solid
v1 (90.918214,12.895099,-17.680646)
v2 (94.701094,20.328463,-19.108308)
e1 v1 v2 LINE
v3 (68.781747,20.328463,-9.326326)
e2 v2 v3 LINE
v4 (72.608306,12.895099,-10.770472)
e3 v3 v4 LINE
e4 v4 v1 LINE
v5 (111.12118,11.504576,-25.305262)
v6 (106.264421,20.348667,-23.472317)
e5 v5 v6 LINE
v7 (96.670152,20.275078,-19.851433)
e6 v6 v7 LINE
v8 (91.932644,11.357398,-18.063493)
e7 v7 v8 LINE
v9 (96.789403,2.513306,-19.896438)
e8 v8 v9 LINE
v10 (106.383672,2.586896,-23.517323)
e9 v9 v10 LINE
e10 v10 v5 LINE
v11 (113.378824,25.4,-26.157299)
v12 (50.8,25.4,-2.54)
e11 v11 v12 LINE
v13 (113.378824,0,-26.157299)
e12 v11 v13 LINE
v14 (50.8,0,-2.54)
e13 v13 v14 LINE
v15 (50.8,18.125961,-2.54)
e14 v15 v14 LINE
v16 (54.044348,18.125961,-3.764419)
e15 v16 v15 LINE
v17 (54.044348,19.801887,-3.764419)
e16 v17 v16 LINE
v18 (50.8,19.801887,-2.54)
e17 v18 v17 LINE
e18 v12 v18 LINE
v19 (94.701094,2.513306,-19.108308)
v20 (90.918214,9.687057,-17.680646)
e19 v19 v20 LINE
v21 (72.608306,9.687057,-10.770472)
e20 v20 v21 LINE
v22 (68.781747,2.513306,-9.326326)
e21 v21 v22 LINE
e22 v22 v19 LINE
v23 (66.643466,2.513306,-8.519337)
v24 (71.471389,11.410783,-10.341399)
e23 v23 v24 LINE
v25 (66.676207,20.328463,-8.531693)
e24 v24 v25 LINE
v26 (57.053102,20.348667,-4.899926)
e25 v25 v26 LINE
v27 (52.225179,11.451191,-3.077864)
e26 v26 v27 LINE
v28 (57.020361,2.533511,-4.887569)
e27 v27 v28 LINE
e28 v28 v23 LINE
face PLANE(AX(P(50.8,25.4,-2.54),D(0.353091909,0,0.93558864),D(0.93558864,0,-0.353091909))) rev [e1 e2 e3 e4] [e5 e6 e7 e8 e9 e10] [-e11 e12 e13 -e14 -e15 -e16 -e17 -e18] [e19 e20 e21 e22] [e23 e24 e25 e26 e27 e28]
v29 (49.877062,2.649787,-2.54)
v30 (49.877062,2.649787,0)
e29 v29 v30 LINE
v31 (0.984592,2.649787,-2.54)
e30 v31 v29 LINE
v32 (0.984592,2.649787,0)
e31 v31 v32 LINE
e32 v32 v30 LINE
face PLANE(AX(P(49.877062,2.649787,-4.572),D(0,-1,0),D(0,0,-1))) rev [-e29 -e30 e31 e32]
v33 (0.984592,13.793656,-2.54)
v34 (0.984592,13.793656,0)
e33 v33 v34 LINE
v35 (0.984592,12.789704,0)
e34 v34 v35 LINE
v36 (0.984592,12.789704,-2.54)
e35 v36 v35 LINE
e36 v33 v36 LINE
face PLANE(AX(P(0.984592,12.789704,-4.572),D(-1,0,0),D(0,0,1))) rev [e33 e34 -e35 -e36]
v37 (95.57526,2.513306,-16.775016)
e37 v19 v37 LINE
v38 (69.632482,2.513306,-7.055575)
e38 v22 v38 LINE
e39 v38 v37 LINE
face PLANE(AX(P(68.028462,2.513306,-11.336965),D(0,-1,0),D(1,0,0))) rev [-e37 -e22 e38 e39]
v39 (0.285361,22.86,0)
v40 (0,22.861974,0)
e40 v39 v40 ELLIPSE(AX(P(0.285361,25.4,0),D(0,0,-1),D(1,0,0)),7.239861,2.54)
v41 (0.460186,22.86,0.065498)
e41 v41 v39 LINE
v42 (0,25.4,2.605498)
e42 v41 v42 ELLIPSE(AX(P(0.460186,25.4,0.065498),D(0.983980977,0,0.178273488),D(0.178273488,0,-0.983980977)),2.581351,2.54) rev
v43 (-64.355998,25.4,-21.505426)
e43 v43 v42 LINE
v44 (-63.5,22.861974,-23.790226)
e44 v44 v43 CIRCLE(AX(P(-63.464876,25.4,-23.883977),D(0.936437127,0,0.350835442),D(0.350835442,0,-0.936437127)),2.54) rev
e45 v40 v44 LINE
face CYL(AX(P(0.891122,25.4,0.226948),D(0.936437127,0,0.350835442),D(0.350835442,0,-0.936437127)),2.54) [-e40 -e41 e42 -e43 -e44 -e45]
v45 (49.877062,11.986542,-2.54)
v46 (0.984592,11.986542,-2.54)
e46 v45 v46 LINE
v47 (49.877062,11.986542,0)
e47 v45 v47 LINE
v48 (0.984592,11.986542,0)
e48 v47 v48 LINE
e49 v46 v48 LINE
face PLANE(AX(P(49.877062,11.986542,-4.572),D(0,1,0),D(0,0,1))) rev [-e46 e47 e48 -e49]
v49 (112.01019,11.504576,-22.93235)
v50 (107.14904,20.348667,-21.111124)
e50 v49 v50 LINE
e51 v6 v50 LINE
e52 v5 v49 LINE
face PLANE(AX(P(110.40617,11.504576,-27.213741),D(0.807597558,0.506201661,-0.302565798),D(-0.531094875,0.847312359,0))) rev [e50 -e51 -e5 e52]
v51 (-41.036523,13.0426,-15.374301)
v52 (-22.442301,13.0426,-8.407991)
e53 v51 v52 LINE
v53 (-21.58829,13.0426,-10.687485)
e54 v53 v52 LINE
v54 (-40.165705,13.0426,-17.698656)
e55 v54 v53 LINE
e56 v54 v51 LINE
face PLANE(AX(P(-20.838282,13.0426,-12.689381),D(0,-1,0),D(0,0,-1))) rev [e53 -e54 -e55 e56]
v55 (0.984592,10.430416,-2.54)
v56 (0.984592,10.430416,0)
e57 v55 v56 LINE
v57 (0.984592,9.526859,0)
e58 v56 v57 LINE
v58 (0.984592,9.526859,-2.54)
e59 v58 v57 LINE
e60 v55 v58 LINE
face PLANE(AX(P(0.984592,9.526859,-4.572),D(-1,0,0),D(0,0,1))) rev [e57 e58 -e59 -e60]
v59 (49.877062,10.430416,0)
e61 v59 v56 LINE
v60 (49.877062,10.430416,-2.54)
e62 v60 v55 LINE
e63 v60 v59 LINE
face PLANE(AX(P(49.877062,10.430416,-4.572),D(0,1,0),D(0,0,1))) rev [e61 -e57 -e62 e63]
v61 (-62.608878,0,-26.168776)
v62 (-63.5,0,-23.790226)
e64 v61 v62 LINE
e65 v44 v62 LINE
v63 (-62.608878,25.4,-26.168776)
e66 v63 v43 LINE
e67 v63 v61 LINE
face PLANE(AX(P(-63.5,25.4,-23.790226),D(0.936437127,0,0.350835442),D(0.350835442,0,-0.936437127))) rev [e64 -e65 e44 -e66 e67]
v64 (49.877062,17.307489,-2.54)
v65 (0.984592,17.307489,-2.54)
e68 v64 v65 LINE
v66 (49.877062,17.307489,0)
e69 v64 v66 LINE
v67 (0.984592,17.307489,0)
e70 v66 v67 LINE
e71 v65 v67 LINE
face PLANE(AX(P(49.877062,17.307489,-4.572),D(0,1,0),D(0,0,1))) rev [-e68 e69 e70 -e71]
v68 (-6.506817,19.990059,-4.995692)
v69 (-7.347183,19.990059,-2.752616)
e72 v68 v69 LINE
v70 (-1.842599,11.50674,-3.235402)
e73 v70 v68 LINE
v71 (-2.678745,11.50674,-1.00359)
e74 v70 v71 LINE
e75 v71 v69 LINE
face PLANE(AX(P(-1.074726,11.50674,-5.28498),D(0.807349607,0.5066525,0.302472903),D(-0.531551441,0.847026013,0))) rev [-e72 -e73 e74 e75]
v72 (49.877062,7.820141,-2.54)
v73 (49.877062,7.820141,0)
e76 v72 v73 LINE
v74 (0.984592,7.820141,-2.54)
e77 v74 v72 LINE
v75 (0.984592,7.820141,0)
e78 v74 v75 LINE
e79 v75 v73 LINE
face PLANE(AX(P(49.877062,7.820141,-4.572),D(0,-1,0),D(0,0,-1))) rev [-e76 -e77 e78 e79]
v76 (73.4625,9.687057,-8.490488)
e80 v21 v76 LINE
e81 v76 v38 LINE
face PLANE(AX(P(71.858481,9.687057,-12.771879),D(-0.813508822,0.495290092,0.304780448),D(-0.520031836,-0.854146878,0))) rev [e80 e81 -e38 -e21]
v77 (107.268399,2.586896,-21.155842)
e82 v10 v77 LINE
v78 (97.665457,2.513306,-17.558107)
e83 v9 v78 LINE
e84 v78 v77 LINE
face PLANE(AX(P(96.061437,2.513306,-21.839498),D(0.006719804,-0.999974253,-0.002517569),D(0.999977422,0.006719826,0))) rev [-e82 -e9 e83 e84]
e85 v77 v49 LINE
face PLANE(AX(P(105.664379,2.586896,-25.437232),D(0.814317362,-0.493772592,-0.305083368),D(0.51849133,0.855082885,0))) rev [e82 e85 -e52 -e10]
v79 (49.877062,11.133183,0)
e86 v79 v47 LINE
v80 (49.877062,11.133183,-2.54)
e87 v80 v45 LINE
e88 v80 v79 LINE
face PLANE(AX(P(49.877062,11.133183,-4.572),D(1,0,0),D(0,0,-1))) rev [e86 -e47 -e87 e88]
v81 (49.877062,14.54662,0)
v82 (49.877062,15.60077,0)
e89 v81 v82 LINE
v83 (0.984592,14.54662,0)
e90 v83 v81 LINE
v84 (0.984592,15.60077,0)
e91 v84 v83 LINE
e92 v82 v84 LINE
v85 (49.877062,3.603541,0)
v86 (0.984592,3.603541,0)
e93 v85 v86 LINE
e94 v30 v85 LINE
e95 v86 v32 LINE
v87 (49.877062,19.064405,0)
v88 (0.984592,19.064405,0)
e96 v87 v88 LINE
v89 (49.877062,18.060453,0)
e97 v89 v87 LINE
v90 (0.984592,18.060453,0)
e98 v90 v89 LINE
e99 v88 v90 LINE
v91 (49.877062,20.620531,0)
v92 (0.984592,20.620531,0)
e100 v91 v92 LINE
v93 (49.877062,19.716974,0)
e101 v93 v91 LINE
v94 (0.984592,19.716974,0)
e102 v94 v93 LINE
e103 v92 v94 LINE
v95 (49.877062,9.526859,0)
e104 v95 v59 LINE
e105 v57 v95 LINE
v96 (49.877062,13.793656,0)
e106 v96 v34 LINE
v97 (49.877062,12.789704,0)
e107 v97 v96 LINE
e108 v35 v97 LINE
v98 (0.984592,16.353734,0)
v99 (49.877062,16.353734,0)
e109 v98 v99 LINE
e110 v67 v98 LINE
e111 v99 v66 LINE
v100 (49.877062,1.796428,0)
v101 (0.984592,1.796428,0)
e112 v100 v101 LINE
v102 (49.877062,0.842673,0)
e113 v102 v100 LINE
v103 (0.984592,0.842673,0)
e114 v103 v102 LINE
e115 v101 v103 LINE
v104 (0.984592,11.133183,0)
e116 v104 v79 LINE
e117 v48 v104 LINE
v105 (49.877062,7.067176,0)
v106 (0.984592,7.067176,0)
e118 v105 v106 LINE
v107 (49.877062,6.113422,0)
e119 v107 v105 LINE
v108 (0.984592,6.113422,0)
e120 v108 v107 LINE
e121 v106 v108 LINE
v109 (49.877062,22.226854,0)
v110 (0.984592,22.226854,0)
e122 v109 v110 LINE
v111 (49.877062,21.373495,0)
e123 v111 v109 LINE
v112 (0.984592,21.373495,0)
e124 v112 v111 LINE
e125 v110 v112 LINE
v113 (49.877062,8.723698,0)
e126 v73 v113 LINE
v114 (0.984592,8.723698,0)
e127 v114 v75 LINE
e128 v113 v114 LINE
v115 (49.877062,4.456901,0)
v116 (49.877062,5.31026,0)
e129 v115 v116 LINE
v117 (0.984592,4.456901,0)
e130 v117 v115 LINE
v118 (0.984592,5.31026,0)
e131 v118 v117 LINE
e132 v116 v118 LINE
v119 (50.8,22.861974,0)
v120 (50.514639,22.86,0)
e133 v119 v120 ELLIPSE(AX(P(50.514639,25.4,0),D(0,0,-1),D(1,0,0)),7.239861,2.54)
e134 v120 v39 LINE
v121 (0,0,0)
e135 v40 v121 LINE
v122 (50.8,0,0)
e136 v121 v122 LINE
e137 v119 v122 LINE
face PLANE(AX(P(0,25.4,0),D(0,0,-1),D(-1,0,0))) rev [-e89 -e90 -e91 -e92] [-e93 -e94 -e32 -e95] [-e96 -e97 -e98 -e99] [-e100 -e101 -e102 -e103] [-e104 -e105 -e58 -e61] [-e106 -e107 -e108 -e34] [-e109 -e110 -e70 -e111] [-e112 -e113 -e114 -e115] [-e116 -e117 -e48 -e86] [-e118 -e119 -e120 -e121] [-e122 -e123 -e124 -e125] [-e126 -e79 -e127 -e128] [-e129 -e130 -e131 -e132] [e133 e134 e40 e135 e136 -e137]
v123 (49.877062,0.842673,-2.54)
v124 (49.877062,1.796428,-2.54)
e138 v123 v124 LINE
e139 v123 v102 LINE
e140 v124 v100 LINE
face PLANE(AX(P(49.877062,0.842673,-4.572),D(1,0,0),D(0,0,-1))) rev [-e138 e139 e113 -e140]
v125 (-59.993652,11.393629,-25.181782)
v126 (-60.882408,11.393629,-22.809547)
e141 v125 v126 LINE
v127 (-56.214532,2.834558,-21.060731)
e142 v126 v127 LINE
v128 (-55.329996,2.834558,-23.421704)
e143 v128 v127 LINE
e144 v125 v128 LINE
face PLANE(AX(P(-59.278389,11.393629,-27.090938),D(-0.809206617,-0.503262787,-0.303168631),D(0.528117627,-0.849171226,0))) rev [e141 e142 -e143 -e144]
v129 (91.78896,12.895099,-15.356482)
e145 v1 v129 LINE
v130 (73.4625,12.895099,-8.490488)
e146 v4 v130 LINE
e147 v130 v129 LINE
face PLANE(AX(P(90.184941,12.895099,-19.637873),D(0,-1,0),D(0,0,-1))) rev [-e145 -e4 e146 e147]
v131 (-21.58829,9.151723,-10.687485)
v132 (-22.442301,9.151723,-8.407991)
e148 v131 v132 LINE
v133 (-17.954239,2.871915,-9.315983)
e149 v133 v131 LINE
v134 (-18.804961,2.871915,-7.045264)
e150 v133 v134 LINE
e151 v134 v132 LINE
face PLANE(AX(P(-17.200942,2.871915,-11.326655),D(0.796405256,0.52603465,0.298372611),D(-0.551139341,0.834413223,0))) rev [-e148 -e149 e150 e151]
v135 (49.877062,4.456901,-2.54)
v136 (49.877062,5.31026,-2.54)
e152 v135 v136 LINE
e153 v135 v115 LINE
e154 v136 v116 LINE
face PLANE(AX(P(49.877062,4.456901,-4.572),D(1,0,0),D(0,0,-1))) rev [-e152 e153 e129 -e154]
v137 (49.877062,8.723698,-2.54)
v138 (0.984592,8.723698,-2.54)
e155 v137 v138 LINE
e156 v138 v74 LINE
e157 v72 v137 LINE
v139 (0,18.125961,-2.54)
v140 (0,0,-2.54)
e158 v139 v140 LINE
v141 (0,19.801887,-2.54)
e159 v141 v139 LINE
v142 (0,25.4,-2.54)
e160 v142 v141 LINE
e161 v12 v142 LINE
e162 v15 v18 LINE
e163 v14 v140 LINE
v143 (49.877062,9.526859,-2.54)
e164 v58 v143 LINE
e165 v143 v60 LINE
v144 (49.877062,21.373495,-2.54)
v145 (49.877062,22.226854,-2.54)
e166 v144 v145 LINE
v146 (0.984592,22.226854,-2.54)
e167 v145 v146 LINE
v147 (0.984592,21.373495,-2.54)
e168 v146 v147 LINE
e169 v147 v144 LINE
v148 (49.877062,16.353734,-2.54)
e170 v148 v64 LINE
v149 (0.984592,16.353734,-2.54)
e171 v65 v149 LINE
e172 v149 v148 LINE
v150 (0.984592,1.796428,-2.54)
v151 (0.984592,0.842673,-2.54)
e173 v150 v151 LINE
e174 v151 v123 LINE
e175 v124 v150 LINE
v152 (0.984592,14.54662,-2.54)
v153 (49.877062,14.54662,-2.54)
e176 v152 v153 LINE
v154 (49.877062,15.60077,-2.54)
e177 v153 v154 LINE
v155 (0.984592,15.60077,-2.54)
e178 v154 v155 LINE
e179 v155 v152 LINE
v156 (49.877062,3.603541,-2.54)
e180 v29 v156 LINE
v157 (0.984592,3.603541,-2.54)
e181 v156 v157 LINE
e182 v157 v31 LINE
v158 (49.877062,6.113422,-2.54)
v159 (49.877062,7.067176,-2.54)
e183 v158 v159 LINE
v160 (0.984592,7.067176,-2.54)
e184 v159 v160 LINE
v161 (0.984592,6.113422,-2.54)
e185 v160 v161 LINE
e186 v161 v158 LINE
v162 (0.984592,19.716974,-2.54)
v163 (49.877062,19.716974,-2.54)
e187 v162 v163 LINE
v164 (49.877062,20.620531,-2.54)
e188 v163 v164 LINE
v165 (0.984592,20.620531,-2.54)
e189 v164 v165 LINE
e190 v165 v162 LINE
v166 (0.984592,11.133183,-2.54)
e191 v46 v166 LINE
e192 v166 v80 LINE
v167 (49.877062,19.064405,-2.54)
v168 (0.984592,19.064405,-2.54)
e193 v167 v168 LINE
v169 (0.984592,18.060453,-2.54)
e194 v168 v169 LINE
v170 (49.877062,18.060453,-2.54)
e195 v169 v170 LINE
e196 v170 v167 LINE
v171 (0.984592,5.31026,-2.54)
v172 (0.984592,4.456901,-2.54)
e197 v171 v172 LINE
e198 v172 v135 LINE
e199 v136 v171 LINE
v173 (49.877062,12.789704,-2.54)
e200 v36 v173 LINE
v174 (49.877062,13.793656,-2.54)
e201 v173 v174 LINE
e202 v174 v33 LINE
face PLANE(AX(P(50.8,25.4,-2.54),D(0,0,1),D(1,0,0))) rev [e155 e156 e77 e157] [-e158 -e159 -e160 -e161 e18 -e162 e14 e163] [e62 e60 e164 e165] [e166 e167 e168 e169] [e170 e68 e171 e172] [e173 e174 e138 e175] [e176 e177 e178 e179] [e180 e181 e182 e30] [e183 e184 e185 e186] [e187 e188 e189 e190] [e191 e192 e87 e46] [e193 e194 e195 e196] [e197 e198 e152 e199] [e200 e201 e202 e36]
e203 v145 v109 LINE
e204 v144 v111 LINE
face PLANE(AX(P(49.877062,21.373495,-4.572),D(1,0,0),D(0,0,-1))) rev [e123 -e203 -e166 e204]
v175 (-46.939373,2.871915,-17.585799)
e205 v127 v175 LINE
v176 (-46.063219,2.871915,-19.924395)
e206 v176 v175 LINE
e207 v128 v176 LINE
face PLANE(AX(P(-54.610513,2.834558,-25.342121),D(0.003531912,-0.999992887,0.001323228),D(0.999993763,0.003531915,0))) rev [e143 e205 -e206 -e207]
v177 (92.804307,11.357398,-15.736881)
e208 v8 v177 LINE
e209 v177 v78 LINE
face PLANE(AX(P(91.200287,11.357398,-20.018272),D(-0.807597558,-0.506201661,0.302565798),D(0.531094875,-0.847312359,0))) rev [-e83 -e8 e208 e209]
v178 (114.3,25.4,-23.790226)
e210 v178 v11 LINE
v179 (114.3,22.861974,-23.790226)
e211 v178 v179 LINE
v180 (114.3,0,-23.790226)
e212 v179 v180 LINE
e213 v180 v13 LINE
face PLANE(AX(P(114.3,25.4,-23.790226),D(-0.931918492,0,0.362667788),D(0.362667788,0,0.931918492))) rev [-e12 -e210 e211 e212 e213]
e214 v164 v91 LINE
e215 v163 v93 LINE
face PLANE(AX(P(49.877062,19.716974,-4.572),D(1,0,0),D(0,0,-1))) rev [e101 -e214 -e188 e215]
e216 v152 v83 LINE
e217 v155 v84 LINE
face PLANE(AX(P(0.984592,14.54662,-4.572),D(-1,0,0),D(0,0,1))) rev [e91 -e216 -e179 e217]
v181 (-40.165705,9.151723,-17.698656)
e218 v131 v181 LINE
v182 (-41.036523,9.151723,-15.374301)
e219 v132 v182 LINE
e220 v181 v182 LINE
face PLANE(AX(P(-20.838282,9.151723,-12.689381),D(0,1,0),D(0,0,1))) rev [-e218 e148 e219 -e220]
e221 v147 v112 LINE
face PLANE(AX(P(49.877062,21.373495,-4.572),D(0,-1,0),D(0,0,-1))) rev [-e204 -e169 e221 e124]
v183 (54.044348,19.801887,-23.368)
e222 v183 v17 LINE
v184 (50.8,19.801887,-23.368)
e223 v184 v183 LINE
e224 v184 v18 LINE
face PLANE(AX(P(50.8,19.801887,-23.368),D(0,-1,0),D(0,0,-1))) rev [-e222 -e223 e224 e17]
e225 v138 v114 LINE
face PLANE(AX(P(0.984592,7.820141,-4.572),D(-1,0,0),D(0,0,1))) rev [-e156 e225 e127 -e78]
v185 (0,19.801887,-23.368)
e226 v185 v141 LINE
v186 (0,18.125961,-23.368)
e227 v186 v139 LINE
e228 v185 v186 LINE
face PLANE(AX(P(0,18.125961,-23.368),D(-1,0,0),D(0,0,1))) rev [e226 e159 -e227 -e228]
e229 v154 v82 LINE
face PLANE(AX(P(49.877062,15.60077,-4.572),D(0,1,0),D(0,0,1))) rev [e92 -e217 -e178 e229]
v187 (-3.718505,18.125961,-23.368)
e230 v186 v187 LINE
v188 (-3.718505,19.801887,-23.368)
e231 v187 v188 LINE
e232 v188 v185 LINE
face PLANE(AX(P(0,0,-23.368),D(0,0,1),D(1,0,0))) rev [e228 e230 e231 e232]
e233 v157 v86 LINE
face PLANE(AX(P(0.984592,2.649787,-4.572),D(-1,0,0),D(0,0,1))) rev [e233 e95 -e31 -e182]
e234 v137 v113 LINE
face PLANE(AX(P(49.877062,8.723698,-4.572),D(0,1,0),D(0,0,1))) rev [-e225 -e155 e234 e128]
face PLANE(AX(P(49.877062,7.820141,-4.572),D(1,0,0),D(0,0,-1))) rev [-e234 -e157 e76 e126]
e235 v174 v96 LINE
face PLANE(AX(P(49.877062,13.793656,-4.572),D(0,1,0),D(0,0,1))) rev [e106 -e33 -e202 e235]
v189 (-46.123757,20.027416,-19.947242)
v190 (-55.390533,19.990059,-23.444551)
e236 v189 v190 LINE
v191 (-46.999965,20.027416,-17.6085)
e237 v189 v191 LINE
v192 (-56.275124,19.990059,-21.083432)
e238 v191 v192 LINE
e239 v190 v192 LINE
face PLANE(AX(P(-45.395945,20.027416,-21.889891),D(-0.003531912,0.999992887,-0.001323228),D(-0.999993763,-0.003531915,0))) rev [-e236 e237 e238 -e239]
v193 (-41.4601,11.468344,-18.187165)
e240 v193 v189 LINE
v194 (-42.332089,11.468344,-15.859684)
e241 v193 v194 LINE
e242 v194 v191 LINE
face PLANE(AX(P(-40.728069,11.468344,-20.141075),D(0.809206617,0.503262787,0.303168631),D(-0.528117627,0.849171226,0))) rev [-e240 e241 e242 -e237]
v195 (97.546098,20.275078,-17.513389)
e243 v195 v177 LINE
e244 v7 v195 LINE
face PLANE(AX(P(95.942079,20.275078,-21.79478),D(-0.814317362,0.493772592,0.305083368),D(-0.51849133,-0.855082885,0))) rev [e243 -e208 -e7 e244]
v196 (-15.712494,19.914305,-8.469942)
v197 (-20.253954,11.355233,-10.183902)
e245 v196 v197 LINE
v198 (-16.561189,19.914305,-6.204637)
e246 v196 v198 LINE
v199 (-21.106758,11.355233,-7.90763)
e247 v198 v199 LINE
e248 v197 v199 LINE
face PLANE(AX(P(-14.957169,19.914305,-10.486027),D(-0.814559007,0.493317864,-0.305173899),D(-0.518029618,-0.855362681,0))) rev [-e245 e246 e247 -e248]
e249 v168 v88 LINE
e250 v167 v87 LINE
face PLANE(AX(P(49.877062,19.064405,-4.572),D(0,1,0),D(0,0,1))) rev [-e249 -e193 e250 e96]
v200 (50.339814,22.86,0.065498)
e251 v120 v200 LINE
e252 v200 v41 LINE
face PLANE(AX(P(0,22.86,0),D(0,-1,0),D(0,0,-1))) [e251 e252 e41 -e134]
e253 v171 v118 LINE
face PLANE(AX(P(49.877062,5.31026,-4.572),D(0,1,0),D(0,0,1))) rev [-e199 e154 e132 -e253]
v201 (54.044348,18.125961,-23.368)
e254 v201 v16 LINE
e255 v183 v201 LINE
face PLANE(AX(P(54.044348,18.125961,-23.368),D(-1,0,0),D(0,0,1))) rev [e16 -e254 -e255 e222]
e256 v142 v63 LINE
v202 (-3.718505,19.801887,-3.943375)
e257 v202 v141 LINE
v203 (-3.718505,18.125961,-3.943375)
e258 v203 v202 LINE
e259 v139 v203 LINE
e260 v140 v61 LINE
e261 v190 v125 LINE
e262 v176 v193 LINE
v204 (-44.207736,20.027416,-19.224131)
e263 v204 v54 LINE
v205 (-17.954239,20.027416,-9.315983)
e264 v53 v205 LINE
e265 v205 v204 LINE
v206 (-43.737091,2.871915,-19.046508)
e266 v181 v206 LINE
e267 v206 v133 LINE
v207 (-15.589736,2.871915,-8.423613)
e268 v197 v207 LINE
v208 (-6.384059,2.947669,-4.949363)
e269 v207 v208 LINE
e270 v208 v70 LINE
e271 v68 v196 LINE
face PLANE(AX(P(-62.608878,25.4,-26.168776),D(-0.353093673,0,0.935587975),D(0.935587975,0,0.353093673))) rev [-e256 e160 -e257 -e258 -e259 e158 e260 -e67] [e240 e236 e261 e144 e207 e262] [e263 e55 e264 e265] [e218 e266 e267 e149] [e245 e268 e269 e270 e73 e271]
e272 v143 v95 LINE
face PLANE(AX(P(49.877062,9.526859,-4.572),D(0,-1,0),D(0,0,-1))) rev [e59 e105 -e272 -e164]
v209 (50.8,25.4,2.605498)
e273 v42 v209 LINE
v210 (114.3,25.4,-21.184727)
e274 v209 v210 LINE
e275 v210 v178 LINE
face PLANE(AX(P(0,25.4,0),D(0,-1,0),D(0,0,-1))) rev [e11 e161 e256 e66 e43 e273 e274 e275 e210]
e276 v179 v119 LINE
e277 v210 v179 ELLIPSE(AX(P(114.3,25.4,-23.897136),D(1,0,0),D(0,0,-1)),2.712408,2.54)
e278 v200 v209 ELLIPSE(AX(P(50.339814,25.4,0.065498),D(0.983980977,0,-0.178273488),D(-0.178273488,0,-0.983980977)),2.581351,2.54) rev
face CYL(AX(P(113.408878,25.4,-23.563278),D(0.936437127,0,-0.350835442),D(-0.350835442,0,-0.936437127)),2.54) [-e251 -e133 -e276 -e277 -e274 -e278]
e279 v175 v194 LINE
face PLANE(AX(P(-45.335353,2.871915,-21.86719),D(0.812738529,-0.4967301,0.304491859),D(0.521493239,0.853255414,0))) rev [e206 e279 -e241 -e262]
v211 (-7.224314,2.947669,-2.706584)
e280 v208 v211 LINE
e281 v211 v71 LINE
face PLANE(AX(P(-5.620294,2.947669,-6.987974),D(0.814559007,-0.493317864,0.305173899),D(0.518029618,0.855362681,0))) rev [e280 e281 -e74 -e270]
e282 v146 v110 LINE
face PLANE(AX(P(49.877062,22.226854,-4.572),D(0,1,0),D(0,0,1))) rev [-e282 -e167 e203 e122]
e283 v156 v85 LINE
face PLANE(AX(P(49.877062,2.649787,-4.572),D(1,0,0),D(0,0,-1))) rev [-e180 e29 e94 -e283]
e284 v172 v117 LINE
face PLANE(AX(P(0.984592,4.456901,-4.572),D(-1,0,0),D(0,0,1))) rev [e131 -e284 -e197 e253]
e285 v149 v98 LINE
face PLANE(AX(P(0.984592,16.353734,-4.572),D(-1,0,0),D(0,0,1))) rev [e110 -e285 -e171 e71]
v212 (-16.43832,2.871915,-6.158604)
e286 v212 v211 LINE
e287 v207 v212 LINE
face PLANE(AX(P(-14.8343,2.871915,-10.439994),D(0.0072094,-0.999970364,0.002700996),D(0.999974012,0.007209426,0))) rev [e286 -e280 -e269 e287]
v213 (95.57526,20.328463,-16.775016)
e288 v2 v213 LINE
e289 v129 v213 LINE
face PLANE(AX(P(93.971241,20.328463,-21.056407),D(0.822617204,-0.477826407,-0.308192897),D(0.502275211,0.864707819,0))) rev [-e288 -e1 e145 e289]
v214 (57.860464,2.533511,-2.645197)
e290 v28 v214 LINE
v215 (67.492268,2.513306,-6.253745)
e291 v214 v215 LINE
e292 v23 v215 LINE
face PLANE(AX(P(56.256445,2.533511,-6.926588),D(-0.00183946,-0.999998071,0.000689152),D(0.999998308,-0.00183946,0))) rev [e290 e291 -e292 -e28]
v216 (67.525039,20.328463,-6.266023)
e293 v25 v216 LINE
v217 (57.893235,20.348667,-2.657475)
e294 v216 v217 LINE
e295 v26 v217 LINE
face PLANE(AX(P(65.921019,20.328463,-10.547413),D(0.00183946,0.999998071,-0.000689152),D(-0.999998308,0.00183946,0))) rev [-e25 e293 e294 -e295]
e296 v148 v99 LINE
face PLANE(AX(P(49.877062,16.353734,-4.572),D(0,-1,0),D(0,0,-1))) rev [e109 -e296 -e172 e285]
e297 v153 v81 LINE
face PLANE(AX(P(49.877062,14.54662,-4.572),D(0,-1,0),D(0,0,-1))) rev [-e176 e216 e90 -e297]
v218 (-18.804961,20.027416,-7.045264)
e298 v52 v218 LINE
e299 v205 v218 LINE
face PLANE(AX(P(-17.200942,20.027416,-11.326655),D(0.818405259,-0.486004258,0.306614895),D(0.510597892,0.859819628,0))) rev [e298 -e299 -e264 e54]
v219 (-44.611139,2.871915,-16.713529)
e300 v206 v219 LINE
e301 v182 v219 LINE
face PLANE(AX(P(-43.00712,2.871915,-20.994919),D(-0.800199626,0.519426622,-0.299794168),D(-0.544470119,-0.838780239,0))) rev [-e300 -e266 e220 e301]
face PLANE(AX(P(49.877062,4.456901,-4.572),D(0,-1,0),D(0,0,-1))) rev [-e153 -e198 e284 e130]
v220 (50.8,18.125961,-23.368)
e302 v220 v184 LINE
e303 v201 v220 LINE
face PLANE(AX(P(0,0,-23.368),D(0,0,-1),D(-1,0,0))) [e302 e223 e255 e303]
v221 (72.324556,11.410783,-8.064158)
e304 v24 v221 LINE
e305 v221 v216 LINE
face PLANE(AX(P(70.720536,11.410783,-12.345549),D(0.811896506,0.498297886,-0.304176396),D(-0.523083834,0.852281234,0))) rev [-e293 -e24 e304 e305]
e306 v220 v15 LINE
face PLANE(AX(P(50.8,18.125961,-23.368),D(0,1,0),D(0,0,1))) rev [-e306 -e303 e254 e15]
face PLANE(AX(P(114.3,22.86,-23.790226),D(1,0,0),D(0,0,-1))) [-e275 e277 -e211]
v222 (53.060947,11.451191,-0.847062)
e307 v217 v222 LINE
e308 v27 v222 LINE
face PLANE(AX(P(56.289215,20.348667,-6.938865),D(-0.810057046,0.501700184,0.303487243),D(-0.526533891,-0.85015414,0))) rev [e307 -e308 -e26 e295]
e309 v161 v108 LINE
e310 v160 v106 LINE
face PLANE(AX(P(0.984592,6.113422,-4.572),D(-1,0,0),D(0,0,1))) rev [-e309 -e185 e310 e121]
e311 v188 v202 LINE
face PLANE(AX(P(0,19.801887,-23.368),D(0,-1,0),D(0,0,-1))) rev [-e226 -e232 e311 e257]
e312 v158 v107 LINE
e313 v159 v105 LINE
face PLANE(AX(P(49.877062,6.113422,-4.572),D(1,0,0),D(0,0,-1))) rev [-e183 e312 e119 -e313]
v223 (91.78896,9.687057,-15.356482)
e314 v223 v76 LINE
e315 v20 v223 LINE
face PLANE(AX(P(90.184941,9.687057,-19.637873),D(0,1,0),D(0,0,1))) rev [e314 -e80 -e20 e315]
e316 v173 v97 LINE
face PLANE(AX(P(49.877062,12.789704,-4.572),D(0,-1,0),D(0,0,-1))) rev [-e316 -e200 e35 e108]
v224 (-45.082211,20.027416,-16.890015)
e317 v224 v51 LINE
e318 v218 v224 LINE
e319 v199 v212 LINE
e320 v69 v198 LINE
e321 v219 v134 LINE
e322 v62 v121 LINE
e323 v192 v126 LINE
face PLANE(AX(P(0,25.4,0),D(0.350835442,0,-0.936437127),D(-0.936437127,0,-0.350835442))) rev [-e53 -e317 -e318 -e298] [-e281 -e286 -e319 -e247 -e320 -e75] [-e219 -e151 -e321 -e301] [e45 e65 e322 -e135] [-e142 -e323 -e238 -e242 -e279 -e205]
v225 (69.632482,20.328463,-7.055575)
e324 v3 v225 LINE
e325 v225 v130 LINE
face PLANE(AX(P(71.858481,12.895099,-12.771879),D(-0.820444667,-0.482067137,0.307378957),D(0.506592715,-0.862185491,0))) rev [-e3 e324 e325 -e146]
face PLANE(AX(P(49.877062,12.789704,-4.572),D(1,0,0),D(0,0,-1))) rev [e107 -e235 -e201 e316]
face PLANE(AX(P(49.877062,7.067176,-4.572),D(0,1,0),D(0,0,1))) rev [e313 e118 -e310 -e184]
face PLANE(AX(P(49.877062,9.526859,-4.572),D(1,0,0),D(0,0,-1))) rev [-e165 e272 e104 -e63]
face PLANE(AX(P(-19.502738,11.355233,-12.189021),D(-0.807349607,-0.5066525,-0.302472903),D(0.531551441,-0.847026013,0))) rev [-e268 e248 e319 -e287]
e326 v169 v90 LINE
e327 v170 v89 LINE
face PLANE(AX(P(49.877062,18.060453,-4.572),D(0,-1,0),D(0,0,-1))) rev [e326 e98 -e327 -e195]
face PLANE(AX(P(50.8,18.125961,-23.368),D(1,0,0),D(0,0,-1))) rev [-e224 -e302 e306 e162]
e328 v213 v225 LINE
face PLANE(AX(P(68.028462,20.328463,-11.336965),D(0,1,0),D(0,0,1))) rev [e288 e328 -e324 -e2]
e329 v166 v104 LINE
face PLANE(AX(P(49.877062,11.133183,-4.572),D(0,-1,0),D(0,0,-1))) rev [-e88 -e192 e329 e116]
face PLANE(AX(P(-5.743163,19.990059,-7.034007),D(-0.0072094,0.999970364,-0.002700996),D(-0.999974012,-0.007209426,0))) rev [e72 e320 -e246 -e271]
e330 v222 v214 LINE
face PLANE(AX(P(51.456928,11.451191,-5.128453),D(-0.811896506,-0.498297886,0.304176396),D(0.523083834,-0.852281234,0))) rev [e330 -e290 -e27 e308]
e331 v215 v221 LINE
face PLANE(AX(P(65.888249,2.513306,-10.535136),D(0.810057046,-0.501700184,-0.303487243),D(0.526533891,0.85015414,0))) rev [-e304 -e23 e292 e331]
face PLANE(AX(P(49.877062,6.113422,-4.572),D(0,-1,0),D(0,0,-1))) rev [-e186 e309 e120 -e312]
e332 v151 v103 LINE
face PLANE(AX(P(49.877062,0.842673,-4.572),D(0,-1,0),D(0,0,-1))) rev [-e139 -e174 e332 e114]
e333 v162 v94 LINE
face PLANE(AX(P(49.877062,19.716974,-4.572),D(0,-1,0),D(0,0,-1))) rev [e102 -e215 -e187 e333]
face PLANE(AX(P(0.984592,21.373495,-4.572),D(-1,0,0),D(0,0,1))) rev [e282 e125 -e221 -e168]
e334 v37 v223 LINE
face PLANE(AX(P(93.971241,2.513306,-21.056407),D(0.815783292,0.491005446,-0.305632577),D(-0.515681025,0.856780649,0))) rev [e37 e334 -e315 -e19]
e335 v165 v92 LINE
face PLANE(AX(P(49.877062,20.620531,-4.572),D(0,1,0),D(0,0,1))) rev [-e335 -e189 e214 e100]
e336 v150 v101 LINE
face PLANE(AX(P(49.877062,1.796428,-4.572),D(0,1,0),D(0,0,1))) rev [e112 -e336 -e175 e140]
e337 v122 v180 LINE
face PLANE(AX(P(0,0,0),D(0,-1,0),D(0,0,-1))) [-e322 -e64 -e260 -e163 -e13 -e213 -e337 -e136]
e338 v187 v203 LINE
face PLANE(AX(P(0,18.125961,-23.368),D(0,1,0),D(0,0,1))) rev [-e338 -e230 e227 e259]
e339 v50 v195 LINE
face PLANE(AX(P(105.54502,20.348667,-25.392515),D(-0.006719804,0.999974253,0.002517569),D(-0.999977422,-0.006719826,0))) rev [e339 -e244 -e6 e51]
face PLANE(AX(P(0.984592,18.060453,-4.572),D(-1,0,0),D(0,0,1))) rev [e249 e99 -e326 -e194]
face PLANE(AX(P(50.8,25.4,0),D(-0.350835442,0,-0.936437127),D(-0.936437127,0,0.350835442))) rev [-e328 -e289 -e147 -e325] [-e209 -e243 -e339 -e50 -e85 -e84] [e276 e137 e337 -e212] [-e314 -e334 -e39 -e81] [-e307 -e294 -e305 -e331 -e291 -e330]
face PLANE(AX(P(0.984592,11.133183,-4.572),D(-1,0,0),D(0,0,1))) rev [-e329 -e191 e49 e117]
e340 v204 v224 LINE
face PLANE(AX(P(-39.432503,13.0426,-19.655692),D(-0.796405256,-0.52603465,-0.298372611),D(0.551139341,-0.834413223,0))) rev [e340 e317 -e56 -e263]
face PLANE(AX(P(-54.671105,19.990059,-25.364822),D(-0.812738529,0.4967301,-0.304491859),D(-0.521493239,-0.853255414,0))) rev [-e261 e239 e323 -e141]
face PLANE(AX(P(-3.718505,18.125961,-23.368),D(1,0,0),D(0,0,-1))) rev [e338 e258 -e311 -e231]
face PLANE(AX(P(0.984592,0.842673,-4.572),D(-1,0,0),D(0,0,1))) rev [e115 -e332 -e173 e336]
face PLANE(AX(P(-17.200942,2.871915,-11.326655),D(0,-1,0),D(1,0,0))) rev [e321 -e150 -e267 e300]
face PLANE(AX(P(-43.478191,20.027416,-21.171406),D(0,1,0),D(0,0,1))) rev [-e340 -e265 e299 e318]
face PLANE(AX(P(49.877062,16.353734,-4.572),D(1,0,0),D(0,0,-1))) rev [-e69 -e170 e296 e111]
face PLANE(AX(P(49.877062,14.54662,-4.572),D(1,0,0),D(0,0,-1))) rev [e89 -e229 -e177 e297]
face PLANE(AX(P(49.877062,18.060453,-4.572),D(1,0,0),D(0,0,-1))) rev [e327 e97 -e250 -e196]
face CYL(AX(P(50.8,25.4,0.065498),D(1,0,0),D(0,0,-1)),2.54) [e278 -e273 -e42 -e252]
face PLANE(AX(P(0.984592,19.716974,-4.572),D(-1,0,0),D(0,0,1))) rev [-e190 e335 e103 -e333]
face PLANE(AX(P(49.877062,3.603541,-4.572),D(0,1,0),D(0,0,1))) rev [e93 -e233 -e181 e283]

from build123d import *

# Parameters (mm, degrees)
BOSS_EXTRUDE1_DEPTH = 25.4
BOSS_EXTRUDE2_DEPTH = 2.54
FILLET1_R           = 2.54
SKETCH4_W           = 48.892470686
SKETCH4_H           = 0.953754561
SKETCH4_H_2         = 0.953754562
SKETCH4_H_3         = 0.853359345
SKETCH4_H_4         = 0.903556953
SKETCH4_H_5         = 0.853359344
SKETCH4_H_6         = 1.00395217
SKETCH4_H_7         = 1.054149779
CUT_EXTRUDE1_DEPTH  = 4.572
CUT_EXTRUDE2_DEPTH  = 4.572
CUT_EXTRUDE3_DEPTH  = 4.572
SKETCH7_W           = 3.24434763
SKETCH7_H           = 1.675925382
SKETCH7_W_2         = 3.718505185
BOSS_EXTRUDE3_DEPTH = 20.828


with BuildPart() as part:
    # Sketch1 → Boss-Extrude1 (new body)
    with BuildSketch(Plane(origin=(0, 0, 0), x_dir=(1, 0, 0), z_dir=(0, 1, 0))):
        Polygon((0, 0), (50.8, 0), (114.3, 23.790225691), (113.37882382, 26.157298661), (50.8, 2.54), (0, 2.54), (-62.608877976, 26.168775993), (-63.5, 23.790225691), align=None)
    extrude(amount=BOSS_EXTRUDE1_DEPTH)

    # Sketch3 → Boss-Extrude2 (add)
    with BuildSketch(Plane(origin=(0, 25.4, 0), x_dir=(1, 0, 0), z_dir=(0, 1, 0))):
        Polygon((-63.5, 23.790225691), (0, 0), (50.8, 0), (114.3, 23.790225691), (114.3, 21.184727317), (50.8, -2.605498375), (0, -2.605498375), (-64.355998278, 21.505426407), align=None)
    extrude(amount=-BOSS_EXTRUDE2_DEPTH)

    # Fillet1
    # the kernel refuses this fillet: 2.54 mm, written as the material it takes off along each edge
    with BuildSketch(Plane(origin=(5.946375755, 22.86, 4.833303434), x_dir=(0, 1, 0), z_dir=(-0.9364371267563882, 0, -0.35083544238323483))) as fillet1_piece_1_section:
        with BuildLine():
            CenterArc((FILLET1_R, FILLET1_R), FILLET1_R, 180, 90)
            Line((0, FILLET1_R), (0, 0))
            Line((0, 0), (FILLET1_R, 0))
        make_face()
    fillet1_piece_1 = extrude(amount=81.424313079, mode=Mode.PRIVATE)
    fillet1_piece_1 = split(fillet1_piece_1, bisect_by=Plane(origin=(0.305909805, 23.474834282, 0), z_dir=(0, 0, 1)), keep=Keep.TOP, mode=Mode.PRIVATE)
    fillet1_piece_1 = split(fillet1_piece_1, bisect_by=Plane(origin=(0.984368862, 23.474834282, 0.36879303), z_dir=(-0.35083544238323505, 0, 0.9364371267563881)), keep=Keep.TOP, mode=Mode.PRIVATE)
    add(fillet1_piece_1, mode=Mode.SUBTRACT)
    with BuildSketch(Plane(origin=(5.946375755, 22.86, 4.833303434), x_dir=(0, 1, 0), z_dir=(-0.9364371267563882, 0, -0.35083544238323483))) as fillet1_piece_2_section:
        with BuildLine():
            CenterArc((FILLET1_R, FILLET1_R), FILLET1_R, 180, 90)
            Line((0, FILLET1_R), (0, 0))
            Line((0, 0), (FILLET1_R, 0))
        make_face()
    fillet1_piece_2 = extrude(amount=81.424313079, mode=Mode.PRIVATE)
    fillet1_piece_2 = split(fillet1_piece_2, bisect_by=Plane(origin=(3.480294326, 22.834935374, 0), z_dir=(0, 0, 1)), keep=Keep.TOP, mode=Mode.PRIVATE)
    fillet1_piece_2 = split(fillet1_piece_2, bisect_by=Plane(origin=(3.46295466, 22.834935374, 1.297393274), z_dir=(0.35083544238323505, 0, -0.9364371267563881)), keep=Keep.TOP, mode=Mode.PRIVATE)
    add(fillet1_piece_2, mode=Mode.SUBTRACT)
    with BuildSketch(Plane(origin=(5.946375755, 22.86, 4.833303434), x_dir=(0, 1, 0), z_dir=(-0.9364371267563882, 0, -0.35083544238323483))) as fillet1_piece_3_section:
        with BuildLine():
            CenterArc((FILLET1_R, FILLET1_R), FILLET1_R, 180, 90)
            Line((0, FILLET1_R), (0, 0))
            Line((0, 0), (FILLET1_R, 0))
        make_face()
    fillet1_piece_3 = extrude(amount=81.424313079, mode=Mode.PRIVATE)
    fillet1_piece_3 = split(fillet1_piece_3, bisect_by=Plane(origin=(-37.699790788, 23.430211039, 0), z_dir=(0, 0, -1)), keep=Keep.TOP, mode=Mode.PRIVATE)
    fillet1_piece_3 = split(fillet1_piece_3, bisect_by=Plane(origin=(-37.047344153, 23.430211039, -13.879758719), z_dir=(-0.35083544238323505, 0, 0.9364371267563881)), keep=Keep.TOP, mode=Mode.PRIVATE)
    add(fillet1_piece_3, mode=Mode.SUBTRACT)
    with BuildSketch(Plane(origin=(57.15, 22.86, 2.605498375), x_dir=(0, 1, 0), z_dir=(-1, 0, 0))) as fillet1_piece_4:
        with BuildLine():
            CenterArc((FILLET1_R, FILLET1_R), FILLET1_R, 180, 90)
            Line((0, FILLET1_R), (0, 0))
            Line((0, 0), (FILLET1_R, 0))
        make_face()
    extrude(amount=63.5, mode=Mode.SUBTRACT)
    with BuildSketch(Plane(origin=(120.246375755, 22.86, -23.412532376), x_dir=(0, 1, 0), z_dir=(-0.9364371267563881, 0, 0.3508354423832351))) as fillet1_piece_5_section:
        with BuildLine():
            CenterArc((FILLET1_R, FILLET1_R), FILLET1_R, 180, 90)
            Line((0, FILLET1_R), (0, 0))
            Line((0, 0), (FILLET1_R, 0))
        make_face()
    fillet1_piece_5 = extrude(amount=80.510211904, mode=Mode.PRIVATE)
    fillet1_piece_5 = split(fillet1_piece_5, bisect_by=Plane(origin=(88.071552379, 23.43012107, 0), z_dir=(0, 0, -1)), keep=Keep.TOP, mode=Mode.PRIVATE)
    fillet1_piece_5 = split(fillet1_piece_5, bisect_by=Plane(origin=(87.41915819, 23.43012107, -13.719339181), z_dir=(0.35083544238323505, 0, 0.9364371267563881)), keep=Keep.TOP, mode=Mode.PRIVATE)
    add(fillet1_piece_5, mode=Mode.SUBTRACT)
    with BuildSketch(Plane(origin=(120.246375755, 22.86, -23.412532376), x_dir=(0, 1, 0), z_dir=(-0.9364371267563881, 0, 0.3508354423832351))) as fillet1_piece_6_section:
        with BuildLine():
            CenterArc((FILLET1_R, FILLET1_R), FILLET1_R, 180, 90)
            Line((0, FILLET1_R), (0, 0))
            Line((0, 0), (FILLET1_R, 0))
        make_face()
    fillet1_piece_6 = extrude(amount=80.510211904, mode=Mode.PRIVATE)
    fillet1_piece_6 = split(fillet1_piece_6, bisect_by=Plane(origin=(50.494090195, 23.474834282, 0), z_dir=(0, 0, 1)), keep=Keep.TOP, mode=Mode.PRIVATE)
    fillet1_piece_6 = split(fillet1_piece_6, bisect_by=Plane(origin=(49.815631138, 23.474834282, 0.36879303), z_dir=(0.35083544238323505, 0, 0.9364371267563881)), keep=Keep.TOP, mode=Mode.PRIVATE)
    add(fillet1_piece_6, mode=Mode.SUBTRACT)
    with BuildSketch(Plane(origin=(120.246375755, 22.86, -23.412532376), x_dir=(0, 1, 0), z_dir=(-0.9364371267563881, 0, 0.3508354423832351))) as fillet1_piece_7_section:
        with BuildLine():
            CenterArc((FILLET1_R, FILLET1_R), FILLET1_R, 180, 90)
            Line((0, FILLET1_R), (0, 0))
            Line((0, 0), (FILLET1_R, 0))
        make_face()
    fillet1_piece_7 = extrude(amount=80.510211904, mode=Mode.PRIVATE)
    fillet1_piece_7 = split(fillet1_piece_7, bisect_by=Plane(origin=(47.319705674, 22.834935374, 0), z_dir=(0, 0, 1)), keep=Keep.TOP, mode=Mode.PRIVATE)
    fillet1_piece_7 = split(fillet1_piece_7, bisect_by=Plane(origin=(47.33704534, 22.834935374, 1.297393274), z_dir=(-0.35083544238323505, 0, -0.9364371267563881)), keep=Keep.TOP, mode=Mode.PRIVATE)
    add(fillet1_piece_7, mode=Mode.SUBTRACT)

    # Sketch4 → Cut-Extrude1 (cut)
    with BuildSketch(Plane.XY):
        with Locations((25.43082689, 1.319550291)):
            Rectangle(SKETCH4_W, SKETCH4_H)
        with Locations((25.43082689, 3.126664197)):
            Rectangle(SKETCH4_W, SKETCH4_H_2)
        with Locations((25.43082689, 4.883580495)):
            Rectangle(SKETCH4_W, SKETCH4_H_3)
        with Locations((25.43082689, 6.590299184)):
            Rectangle(SKETCH4_W, SKETCH4_H_2)
        with Locations((25.43082689, 8.271919069)):
            Rectangle(SKETCH4_W, SKETCH4_H_4)
        with Locations((25.43082689, 9.978637758)):
            Rectangle(SKETCH4_W, SKETCH4_H_4)
        with Locations((25.43082689, 11.559862426)):
            Rectangle(SKETCH4_W, SKETCH4_H_5)
        with Locations((25.43082689, 13.29167992)):
            Rectangle(SKETCH4_W, SKETCH4_H_6)
        with Locations((25.43082689, 15.073695022)):
            Rectangle(SKETCH4_W, SKETCH4_H_7)
        with Locations((25.43082689, 16.83061132)):
            Rectangle(SKETCH4_W, SKETCH4_H)
        with Locations((25.43082689, 18.562428813)):
            Rectangle(SKETCH4_W, SKETCH4_H_6)
        with Locations((25.43082689, 20.168752286)):
            Rectangle(SKETCH4_W, SKETCH4_H_4)
        with Locations((25.43082689, 21.800174562)):
            Rectangle(SKETCH4_W, SKETCH4_H_3)
    extrude(amount=-CUT_EXTRUDE1_DEPTH, mode=Mode.SUBTRACT)

    # Sketch5 → Cut-Extrude2 (cut)
    with BuildSketch(Plane(origin=(6.252743788, 0, 16.689594948), x_dir=(0.9364371267563881, 0, -0.35083544238323516), z_dir=(0.35083544238323516, 0, 0.9364371267563881))):
        Polygon((95.385492335, 2.513306314), (91.342188498, 9.687056546), (71.771776783, 9.687056546), (67.681786758, 2.513306314), align=None)
        Polygon((107.872330044, 2.586895642), (112.935981689, 11.50457622), (107.744869589, 20.34866747), (97.490105842, 20.275078142), (92.426454197, 11.357397564), (97.617566297, 2.513306314), align=None)
        Polygon((65.396301526, 2.513306314), (70.556591706, 11.410782697), (65.431296219, 20.328463275), (55.145710553, 20.34866747), (49.985420372, 11.451191088), (55.110715859, 2.53351051), align=None)
        Polygon((91.342188498, 12.895099362), (71.771776783, 12.895099362), (67.681786758, 20.328463275), (95.385492335, 20.328463275), align=None)
    extrude(amount=-CUT_EXTRUDE2_DEPTH, mode=Mode.SUBTRACT)

    # Sketch6 → Cut-Extrude3 (cut)
    with BuildSketch(Plane(origin=(0, 0, 0), x_dir=(0.9364371267563881, 0, 0.35083544238323516), z_dir=(-0.35083544238323516, 0, 0.9364371267563881))):
        Polygon((-20.081392491, 2.871915117), (-47.639225338, 2.871915117), (-43.82197308, 9.151723276), (-23.965625147, 9.151723276), align=None)
        Polygon((-7.714681248, 2.947668713), (-2.860571572, 11.506740488), (-7.845890325, 19.990058667), (-17.685318752, 19.914305072), (-22.539428428, 11.355233297), (-17.554109675, 2.871915117), align=None)
        Polygon((-50.125492855, 2.871915117), (-45.20547879, 11.468344332), (-50.190197838, 20.027416107), (-60.094930953, 19.990058667), (-65.014945018, 11.393629453), (-60.030225969, 2.834557678), align=None)
        Polygon((-23.965625147, 13.042600451), (-43.82197308, 13.042600451), (-48.142272105, 20.027416107), (-20.081392491, 20.027416107), align=None)
    extrude(amount=-CUT_EXTRUDE3_DEPTH, mode=Mode.SUBTRACT)

    # Sketch7 → Boss-Extrude3 (add)
    with BuildSketch(Plane(origin=(0, 0, -2.54), x_dir=(-1, 0, 0), z_dir=(0, 0, -1))):
        with Locations((-52.422173815, 18.963924101)):
            Rectangle(SKETCH7_W, SKETCH7_H)
        with Locations((1.859252593, 18.963924101)):
            Rectangle(SKETCH7_W_2, SKETCH7_H)
    extrude(amount=BOSS_EXTRUDE3_DEPTH)


solid = part.part
